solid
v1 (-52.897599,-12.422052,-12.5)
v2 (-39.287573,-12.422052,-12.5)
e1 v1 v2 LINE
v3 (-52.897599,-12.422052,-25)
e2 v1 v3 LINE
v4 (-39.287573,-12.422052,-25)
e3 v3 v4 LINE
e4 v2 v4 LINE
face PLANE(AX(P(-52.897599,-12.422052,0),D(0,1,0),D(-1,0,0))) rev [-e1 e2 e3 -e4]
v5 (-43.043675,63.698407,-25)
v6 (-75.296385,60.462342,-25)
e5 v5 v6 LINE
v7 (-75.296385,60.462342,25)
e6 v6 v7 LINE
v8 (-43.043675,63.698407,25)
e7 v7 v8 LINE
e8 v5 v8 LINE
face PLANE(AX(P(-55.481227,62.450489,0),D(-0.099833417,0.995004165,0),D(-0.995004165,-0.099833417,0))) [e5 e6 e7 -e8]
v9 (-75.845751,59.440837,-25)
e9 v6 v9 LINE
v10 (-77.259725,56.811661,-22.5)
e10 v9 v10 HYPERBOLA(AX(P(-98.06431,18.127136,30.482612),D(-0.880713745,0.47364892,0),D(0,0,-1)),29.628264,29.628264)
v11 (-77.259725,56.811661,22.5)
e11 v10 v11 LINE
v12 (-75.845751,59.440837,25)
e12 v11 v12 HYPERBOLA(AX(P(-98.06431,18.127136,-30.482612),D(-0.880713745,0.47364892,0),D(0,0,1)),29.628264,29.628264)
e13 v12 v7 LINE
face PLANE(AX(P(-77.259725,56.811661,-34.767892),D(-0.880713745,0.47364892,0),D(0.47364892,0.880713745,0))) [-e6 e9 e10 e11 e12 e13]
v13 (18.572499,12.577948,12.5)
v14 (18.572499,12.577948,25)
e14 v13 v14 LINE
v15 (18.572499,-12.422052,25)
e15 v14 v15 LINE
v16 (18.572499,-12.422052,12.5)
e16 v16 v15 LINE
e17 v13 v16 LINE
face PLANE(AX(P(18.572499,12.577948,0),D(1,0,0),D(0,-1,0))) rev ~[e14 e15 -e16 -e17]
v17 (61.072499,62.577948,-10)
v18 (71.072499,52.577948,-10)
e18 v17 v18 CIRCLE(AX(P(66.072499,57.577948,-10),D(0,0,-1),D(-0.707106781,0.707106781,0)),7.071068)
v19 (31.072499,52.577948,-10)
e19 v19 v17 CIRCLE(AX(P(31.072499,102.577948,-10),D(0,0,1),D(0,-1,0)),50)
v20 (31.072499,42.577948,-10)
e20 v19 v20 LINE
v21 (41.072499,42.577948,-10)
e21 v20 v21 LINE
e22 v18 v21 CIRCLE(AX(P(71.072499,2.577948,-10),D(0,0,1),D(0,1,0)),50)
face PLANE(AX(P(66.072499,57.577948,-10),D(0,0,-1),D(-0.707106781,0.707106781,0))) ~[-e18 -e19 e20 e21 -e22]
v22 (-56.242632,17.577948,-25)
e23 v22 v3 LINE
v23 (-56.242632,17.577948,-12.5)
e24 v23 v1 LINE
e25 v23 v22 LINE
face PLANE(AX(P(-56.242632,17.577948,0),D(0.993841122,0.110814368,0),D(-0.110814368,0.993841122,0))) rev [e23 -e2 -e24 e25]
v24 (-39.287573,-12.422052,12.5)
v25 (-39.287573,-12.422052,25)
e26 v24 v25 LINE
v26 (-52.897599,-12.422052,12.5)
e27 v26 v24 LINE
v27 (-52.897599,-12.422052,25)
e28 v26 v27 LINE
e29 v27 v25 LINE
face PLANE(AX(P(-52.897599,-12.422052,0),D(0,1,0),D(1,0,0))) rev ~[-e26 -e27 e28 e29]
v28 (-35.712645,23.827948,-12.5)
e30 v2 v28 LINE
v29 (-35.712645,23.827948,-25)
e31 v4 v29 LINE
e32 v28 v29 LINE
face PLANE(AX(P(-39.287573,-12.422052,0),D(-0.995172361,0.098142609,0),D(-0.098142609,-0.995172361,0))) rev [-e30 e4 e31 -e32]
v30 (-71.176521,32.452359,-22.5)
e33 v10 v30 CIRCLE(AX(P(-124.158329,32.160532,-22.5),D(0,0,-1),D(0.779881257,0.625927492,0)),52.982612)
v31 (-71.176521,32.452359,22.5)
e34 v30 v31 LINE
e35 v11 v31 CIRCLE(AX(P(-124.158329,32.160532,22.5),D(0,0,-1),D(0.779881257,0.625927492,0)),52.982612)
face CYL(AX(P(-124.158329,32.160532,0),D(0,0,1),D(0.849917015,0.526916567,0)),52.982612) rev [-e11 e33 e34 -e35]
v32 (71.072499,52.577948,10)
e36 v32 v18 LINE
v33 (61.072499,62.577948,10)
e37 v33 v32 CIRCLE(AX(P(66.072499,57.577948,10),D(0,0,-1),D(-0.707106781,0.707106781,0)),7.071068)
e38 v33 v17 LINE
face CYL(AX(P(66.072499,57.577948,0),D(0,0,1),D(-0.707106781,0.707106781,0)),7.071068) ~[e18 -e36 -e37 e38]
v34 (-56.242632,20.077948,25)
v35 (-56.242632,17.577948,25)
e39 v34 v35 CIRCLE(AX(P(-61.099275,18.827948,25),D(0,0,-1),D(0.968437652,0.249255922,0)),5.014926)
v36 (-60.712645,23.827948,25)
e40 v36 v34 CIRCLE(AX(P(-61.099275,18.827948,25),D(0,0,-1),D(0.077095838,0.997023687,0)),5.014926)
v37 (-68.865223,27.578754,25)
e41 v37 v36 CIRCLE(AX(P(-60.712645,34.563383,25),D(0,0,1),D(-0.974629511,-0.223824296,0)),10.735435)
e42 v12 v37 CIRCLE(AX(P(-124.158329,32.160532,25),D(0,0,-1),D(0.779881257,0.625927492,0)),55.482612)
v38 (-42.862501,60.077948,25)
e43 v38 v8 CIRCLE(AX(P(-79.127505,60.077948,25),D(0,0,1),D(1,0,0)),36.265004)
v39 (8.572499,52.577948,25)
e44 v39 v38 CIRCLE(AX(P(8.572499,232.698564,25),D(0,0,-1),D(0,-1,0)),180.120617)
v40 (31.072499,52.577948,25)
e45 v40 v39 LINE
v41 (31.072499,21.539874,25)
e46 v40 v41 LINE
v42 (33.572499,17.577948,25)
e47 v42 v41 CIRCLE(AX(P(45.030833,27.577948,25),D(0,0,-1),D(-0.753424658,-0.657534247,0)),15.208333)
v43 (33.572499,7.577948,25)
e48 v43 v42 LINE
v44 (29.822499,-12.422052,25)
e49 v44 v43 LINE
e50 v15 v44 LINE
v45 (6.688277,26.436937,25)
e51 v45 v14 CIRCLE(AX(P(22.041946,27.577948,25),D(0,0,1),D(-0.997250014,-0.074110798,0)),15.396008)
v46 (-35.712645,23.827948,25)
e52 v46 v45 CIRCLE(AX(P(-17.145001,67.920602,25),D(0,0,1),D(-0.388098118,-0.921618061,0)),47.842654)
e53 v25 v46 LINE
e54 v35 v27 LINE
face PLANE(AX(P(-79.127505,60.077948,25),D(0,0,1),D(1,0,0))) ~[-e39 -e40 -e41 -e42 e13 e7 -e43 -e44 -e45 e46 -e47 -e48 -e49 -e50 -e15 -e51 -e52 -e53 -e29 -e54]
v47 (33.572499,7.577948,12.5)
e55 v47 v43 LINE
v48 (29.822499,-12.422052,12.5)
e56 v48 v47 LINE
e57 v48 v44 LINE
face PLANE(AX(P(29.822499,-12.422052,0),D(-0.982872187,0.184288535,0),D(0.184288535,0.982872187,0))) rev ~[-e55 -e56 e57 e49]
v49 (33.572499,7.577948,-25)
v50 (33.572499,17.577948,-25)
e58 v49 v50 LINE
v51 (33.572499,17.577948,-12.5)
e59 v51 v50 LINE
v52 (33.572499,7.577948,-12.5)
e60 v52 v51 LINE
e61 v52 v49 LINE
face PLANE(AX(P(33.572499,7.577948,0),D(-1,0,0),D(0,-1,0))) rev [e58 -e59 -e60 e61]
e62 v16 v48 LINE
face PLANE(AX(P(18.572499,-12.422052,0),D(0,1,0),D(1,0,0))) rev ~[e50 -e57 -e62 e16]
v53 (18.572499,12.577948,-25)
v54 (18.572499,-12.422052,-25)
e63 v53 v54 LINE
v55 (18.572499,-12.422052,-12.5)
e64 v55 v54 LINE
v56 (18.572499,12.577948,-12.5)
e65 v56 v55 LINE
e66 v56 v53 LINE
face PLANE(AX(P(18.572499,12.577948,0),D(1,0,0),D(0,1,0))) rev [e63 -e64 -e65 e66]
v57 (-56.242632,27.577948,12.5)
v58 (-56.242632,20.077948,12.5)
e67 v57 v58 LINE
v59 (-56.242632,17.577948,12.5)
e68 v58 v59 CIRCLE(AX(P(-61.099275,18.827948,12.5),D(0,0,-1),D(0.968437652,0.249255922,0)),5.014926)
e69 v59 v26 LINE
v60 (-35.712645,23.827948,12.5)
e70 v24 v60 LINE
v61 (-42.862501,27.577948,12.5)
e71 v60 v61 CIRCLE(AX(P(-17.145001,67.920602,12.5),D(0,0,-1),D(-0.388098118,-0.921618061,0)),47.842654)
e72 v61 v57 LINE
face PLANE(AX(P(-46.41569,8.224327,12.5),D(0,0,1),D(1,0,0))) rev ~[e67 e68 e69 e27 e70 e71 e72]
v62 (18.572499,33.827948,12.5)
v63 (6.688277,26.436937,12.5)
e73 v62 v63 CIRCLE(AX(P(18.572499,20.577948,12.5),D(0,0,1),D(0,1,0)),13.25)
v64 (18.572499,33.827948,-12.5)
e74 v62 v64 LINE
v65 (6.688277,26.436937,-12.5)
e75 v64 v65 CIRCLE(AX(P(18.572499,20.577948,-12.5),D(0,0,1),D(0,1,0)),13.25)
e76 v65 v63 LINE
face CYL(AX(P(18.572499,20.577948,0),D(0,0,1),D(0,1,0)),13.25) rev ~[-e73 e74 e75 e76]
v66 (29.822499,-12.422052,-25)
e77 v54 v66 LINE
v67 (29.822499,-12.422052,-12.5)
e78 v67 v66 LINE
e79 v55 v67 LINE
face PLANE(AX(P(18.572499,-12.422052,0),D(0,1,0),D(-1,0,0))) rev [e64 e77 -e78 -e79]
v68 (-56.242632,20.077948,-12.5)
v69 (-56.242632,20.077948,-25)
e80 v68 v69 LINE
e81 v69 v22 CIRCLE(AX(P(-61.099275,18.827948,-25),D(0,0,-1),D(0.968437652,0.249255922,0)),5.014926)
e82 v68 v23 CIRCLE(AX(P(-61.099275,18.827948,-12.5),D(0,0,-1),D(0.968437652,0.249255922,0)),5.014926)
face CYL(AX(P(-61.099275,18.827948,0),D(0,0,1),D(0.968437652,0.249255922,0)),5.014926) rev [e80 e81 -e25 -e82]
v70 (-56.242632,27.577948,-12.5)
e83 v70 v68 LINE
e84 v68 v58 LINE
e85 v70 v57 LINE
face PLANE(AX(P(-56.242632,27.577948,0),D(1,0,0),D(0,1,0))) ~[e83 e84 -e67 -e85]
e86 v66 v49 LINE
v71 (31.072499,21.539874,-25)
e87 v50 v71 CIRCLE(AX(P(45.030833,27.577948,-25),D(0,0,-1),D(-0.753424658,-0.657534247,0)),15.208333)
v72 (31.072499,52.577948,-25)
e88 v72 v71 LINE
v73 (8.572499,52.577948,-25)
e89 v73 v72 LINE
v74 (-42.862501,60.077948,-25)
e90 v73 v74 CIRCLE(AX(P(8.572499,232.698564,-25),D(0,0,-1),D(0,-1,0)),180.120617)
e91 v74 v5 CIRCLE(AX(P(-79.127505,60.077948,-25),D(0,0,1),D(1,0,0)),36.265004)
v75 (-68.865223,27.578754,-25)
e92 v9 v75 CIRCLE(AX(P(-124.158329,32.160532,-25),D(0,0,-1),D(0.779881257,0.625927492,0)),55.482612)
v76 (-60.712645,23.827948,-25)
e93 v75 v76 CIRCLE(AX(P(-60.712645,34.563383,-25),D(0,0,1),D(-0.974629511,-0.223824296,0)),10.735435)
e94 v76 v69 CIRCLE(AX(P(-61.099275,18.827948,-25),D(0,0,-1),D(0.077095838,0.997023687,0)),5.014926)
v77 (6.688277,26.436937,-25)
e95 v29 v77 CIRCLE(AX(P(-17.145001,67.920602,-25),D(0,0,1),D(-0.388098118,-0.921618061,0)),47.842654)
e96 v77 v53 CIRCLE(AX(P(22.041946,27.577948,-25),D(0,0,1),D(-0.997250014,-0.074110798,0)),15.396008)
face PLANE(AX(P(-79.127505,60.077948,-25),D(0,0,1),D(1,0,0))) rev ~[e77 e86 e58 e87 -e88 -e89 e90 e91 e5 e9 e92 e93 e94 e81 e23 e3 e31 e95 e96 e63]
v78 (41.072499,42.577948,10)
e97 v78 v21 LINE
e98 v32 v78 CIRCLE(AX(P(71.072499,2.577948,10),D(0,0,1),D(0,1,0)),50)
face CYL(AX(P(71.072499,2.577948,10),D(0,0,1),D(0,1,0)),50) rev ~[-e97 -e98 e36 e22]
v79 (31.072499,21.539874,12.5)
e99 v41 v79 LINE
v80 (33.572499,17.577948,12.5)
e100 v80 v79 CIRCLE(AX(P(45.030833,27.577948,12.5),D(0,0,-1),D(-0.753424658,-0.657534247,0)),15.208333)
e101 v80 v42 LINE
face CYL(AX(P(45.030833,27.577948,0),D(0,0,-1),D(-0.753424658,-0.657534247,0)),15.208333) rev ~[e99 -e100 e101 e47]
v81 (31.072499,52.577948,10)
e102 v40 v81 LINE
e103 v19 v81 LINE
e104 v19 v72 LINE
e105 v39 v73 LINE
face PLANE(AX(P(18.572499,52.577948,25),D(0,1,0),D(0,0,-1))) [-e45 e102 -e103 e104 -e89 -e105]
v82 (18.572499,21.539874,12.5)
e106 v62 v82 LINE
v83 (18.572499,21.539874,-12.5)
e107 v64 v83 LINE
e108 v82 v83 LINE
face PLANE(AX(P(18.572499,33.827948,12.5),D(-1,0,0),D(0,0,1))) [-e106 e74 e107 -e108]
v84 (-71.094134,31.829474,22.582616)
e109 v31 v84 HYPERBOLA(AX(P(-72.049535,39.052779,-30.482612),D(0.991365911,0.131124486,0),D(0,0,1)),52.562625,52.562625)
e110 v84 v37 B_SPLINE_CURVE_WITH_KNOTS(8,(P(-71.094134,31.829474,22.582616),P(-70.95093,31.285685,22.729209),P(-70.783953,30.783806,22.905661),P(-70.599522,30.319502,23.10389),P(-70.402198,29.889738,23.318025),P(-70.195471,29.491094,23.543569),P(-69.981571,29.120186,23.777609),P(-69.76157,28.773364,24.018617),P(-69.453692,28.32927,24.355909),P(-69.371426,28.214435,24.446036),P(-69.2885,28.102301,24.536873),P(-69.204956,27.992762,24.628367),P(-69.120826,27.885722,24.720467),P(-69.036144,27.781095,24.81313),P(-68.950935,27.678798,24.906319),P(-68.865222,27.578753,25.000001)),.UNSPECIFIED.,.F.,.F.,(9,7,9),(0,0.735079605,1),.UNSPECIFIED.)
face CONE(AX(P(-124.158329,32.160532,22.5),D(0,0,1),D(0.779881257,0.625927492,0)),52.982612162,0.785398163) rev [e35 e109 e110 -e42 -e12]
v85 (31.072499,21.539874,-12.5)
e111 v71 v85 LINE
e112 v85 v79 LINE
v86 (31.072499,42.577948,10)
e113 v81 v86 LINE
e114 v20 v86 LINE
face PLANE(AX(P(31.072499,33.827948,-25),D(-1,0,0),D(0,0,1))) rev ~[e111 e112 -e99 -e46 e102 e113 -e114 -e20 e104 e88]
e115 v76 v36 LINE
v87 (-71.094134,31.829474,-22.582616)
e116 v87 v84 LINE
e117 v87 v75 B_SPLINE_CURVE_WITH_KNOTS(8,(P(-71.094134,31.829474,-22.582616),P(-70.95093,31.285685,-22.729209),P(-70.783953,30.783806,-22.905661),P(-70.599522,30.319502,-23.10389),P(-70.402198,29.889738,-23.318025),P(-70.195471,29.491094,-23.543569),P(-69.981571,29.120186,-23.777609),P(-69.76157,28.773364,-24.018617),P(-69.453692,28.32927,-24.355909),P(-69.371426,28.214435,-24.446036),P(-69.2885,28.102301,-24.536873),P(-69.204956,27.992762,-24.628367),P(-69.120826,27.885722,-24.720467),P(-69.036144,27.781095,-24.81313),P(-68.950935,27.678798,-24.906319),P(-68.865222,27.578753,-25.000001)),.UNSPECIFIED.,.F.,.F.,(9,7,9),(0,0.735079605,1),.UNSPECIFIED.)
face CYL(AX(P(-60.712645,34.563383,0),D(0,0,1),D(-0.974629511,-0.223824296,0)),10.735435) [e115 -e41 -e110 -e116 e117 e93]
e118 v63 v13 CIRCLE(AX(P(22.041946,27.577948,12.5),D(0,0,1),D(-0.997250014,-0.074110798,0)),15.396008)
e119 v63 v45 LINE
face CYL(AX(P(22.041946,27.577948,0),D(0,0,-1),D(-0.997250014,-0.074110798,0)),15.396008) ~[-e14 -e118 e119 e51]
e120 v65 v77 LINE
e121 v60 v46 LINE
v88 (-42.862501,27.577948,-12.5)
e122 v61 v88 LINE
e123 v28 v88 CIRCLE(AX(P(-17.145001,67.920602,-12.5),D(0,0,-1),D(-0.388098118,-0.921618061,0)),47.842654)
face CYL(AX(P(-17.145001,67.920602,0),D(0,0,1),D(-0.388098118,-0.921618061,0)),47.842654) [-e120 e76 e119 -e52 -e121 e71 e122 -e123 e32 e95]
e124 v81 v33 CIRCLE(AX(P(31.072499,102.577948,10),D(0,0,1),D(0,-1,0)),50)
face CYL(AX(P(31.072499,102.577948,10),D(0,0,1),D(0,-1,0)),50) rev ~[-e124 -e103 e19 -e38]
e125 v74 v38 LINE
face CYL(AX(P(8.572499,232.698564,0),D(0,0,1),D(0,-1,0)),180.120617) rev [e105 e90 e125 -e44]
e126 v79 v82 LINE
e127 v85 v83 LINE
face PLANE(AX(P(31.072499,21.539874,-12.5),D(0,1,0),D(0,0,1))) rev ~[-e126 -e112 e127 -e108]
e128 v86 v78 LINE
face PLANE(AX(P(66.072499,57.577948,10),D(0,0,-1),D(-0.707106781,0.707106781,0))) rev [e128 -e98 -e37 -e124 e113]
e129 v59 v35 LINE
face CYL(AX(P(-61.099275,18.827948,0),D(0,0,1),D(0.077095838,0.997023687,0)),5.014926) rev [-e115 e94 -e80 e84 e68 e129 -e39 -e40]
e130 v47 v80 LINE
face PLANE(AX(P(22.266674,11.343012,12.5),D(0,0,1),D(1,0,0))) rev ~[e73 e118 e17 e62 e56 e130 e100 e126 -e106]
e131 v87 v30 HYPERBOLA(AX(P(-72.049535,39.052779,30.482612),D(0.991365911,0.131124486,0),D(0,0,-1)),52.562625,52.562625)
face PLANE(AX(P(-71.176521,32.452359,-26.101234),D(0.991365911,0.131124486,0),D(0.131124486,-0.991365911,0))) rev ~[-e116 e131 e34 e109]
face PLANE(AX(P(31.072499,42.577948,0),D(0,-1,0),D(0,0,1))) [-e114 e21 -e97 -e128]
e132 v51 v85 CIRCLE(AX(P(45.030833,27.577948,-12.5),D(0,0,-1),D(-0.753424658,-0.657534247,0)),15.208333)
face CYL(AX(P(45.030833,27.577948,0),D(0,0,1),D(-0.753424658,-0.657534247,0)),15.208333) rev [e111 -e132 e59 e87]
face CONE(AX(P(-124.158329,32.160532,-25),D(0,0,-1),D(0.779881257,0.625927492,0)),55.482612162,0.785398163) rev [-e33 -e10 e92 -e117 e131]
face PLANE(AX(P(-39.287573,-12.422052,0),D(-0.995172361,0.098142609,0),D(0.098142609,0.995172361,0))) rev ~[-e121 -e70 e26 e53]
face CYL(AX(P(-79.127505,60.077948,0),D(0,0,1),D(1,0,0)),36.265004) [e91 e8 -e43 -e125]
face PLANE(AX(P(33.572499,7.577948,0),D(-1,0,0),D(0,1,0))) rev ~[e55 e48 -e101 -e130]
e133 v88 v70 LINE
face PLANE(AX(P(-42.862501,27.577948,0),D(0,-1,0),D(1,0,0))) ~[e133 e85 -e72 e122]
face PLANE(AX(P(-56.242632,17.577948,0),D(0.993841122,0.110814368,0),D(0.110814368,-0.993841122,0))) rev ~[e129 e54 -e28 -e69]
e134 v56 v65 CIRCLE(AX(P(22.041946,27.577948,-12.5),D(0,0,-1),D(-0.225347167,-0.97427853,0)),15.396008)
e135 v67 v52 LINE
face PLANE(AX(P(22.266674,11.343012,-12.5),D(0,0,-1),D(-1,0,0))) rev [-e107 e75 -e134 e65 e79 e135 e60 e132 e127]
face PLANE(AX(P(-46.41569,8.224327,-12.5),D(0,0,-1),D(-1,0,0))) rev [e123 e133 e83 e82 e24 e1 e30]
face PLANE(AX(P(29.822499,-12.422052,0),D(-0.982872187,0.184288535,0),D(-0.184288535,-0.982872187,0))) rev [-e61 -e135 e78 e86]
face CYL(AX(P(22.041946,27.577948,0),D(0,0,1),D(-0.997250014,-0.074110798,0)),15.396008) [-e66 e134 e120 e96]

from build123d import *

# Parameters (mm, degrees)
F1_DEPTH     = 25
F2_DEPTH     = 12.5
F4_DEPTH     = 12.5
F5_DEPTH     = 16.25
F7_DEPTH     = 24.3842223705
F6_W         = 10
F6_H         = 10
F8_DEPTH     = 40
F10_DEPTH    = 20
F11_W        = 7.0710678119
F11_H        = 20
F12_ANGLE    = 180
F13_W        = 25
F13_H        = 50
F13_W_2      = 11.2650044263
F14_ANGLE    = 5.7295779513
F15_T1_DEPTH = 52.2024679969
F15_T3_DEPTH = 69.535784442
F15_T6_ANGLE = 45.7032352823
F15_T8_ANGLE = 45.7032352823


# Not quite as in the source:
# - a fillet or chamfer that OpenCascade refuses, or shapes differently, is made with other operations: its cross-section is extruded or revolved along the edge and cut away or added
# - a pattern or mirror of a feature is missing from the dataset's text; its kind, count and spacing are read off the source's solid


with BuildPart() as f1:
    # F0 (on Top) → F1 (new body)
    with BuildSketch(Plane.XY):
        with BuildLine():
            ThreePointArc((8.5724992678, 52.5779476486), (-17.4169661561, 54.4628096646), (-42.8625009954, 60.0779476486))
            Line((-42.8625009954, 60.0779476486), (-79.1275054216, 60.0779476486))
            ThreePointArc((-79.1275054216, 60.0779476486), (-73.2024272044, 46.6744306132), (-71.1757168174, 32.1605315572))
            ThreePointArc((-71.1757168174, 32.1605315572), (-67.4004664777, 26.1656086442), (-60.7126449392, 23.8279476486))
            ThreePointArc((-60.7126449392, 23.8279476486), (-57.8761392565, 22.6699366601), (-56.2426317111, 20.0779476486))
            Line((-56.2426317111, 20.0779476486), (-56.2426317111, 27.5779476486))
            Line((-56.2426317111, 27.5779476486), (-42.8625009954, 27.5779476486))
            ThreePointArc((-42.8625009954, 27.5779476486), (-39.3668172692, 25.5518582213), (-35.7126449392, 23.8279476486))
            ThreePointArc((-35.7126449392, 23.8279476486), (-14.2067307678, 20.1682602333), (6.6882768972, 26.4369372072))
            ThreePointArc((6.6882768972, 26.4369372072), (11.5749679763, 31.8294833583), (18.5724992678, 33.8279476486))
            Line((18.5724992678, 33.8279476486), (18.5724992678, 40.0779476486))
            Line((18.5724992678, 40.0779476486), (18.5724992678, 52.5779476486))
            Line((18.5724992678, 52.5779476486), (8.5724992678, 52.5779476486))
        make_face()
        with BuildLine():
            Line((-56.2426317111, 27.5779476486), (-56.2426317111, 20.0779476486))
            ThreePointArc((-56.2426317111, 20.0779476486), (-56.084348871, 18.8279476486), (-56.2426317111, 17.5779476486))
            Line((-56.2426317111, 17.5779476486), (-52.8975990321, -12.4220523514))
            Line((-52.8975990321, -12.4220523514), (-39.2875729673, -12.4220523514))
            Line((-39.2875729673, -12.4220523514), (-35.7126449392, 23.8279476486))
            ThreePointArc((-35.7126449392, 23.8279476486), (-39.3668172692, 25.5518582213), (-42.8625009954, 27.5779476486))
            Line((-42.8625009954, 27.5779476486), (-56.2426317111, 27.5779476486))
        make_face()
        with BuildLine():
            ThreePointArc((29.8224992678, 27.5779476486), (25.0072681059, 32.1605315572), (18.5724992678, 33.8279476486))
            ThreePointArc((18.5724992678, 33.8279476486), (11.5749679763, 31.8294833583), (6.6882768972, 26.4369372072))
            ThreePointArc((6.6882768972, 26.4369372072), (10.35454594, 17.5558849939), (18.5724992678, 12.5779476486))
            Line((18.5724992678, 12.5779476486), (18.5724992678, -12.4220523514))
            Line((18.5724992678, -12.4220523514), (29.8224992678, -12.4220523514))
            Line((29.8224992678, -12.4220523514), (33.5724992678, 7.5779476486))
            Line((33.5724992678, 7.5779476486), (33.5724992678, 17.5779476486))
            ThreePointArc((33.5724992678, 17.5779476486), (30.7908263589, 22.2379453078), (29.8224992678, 27.5779476486))
        make_face()
    extrude(amount=F1_DEPTH)

    # F0 (on Top) → F2 (cut)
    with BuildSketch(Plane.XY):
        with BuildLine():
            ThreePointArc((29.8224992678, 27.5779476486), (25.0072681059, 32.1605315572), (18.5724992678, 33.8279476486))
            ThreePointArc((18.5724992678, 33.8279476486), (11.5749679763, 31.8294833583), (6.6882768972, 26.4369372072))
            ThreePointArc((6.6882768972, 26.4369372072), (10.35454594, 17.5558849939), (18.5724992678, 12.5779476486))
            Line((18.5724992678, 12.5779476486), (18.5724992678, -12.4220523514))
            Line((18.5724992678, -12.4220523514), (29.8224992678, -12.4220523514))
            Line((29.8224992678, -12.4220523514), (33.5724992678, 7.5779476486))
            Line((33.5724992678, 7.5779476486), (33.5724992678, 17.5779476486))
            ThreePointArc((33.5724992678, 17.5779476486), (30.7908263589, 22.2379453078), (29.8224992678, 27.5779476486))
        make_face()
        with BuildLine():
            Line((-56.2426317111, 27.5779476486), (-56.2426317111, 20.0779476486))
            ThreePointArc((-56.2426317111, 20.0779476486), (-56.084348871, 18.8279476486), (-56.2426317111, 17.5779476486))
            Line((-56.2426317111, 17.5779476486), (-52.8975990321, -12.4220523514))
            Line((-52.8975990321, -12.4220523514), (-39.2875729673, -12.4220523514))
            Line((-39.2875729673, -12.4220523514), (-35.7126449392, 23.8279476486))
            ThreePointArc((-35.7126449392, 23.8279476486), (-39.3668172692, 25.5518582213), (-42.8625009954, 27.5779476486))
            Line((-42.8625009954, 27.5779476486), (-56.2426317111, 27.5779476486))
        make_face()
    extrude(amount=F2_DEPTH, mode=Mode.SUBTRACT)

    # F3: F1 across plane


with BuildPart() as f1_1:
    add(f1.part)
    add(f1.part.mirror(Plane.XY))

    # F4 (add): a face of the model
    f4_faces = [f1_1.faces().sort_by_distance(p)[0] for p in [
        (18.5724992678, 43.2029476486, 0),
    ]]
    extrude(f4_faces, amount=F4_DEPTH)

    # F5 (add, through all): a face of the model
    f5_faces = [f1_1.faces().sort_by_distance(p)[0] for p in [
        (24.8224992678, 33.8279476486, 0),
    ]]
    extrude(f5_faces, amount=F5_DEPTH)

    # F6 (on face) → F7 (cut, through all)
    with BuildSketch(Plane.YZ.offset(31.0724992678)):
        Polygon((21.5398740044, 0), (21.5398740044, 12.5), (17.5779476486, 12.5), (17.5779476486, -12.5), (21.5398740044, -12.5), align=None)
    extrude(amount=-F7_DEPTH, mode=Mode.SUBTRACT)

    # F6 (on face) → F8 (join)
    with BuildSketch(Plane.YZ.offset(31.0724992678)):
        Polygon((62.5779476486, 10), (52.5779476486, 10), (52.5779476486, 0), (52.5779476486, -10), (62.5779476486, -10), align=None)
        with Locations((47.5779476486, 5)):
            Rectangle(F6_W, F6_H)
    f8 = extrude(amount=F8_DEPTH)

    # F8_copies: F8 across plane
    add(f8.mirror(Plane(origin=(0, 0, 0), x_dir=(-1, 0, 0), z_dir=(0, 0, -1))))

    # F9 (on face) → F10 (cut, through all)
    with BuildSketch(Plane.XY.offset(10)):
        with BuildLine():
            ThreePointArc((31.0724992678, 52.5779476486), (46.8838875686, 55.1437827461), (61.0724992678, 62.5779476486))
            Line((61.0724992678, 62.5779476486), (51.0724992678, 62.5779476486))
            Line((51.0724992678, 62.5779476486), (31.0724992678, 62.5779476486))
            Line((31.0724992678, 62.5779476486), (31.0724992678, 52.5779476486))
        make_face()
        Polygon((71.0724992678, 52.5779476486), (71.0724992678, 62.5779476486), (61.0724992678, 62.5779476486), align=None)
        with BuildLine():
            Line((71.0724992678, 42.5779476486), (71.0724992678, 52.5779476486))
            ThreePointArc((71.0724992678, 52.5779476486), (55.2611109669, 50.0121125511), (41.0724992678, 42.5779476486))
            Line((41.0724992678, 42.5779476486), (51.0724992678, 42.5779476486))
            Line((51.0724992678, 42.5779476486), (71.0724992678, 42.5779476486))
        make_face()
    extrude(amount=-F10_DEPTH, mode=Mode.SUBTRACT)

    # F11 (on face) → F12 (revolve)
    with BuildSketch(Plane(origin=(61.8252234582, 61.8252234582, 0), x_dir=(-0.7071067812, 0.7071067812, 0), z_dir=(0.7071067812, 0.7071067812, 0))):
        with Locations((-2.4710211471, 0)):
            Rectangle(F11_W, F11_H)
    revolve(axis=Axis((66.0724992678, 57.5779476486, 0), (0, 0, -1)), revolution_arc=F12_ANGLE)

    # F13 (on face) → F14 (revolve)
    with BuildSketch(Plane(origin=(0, 60.0779476486, 0), x_dir=(-1, 0, 0), z_dir=(0, 1, 0))):
        with Locations((55.3625009954, 0)):
            Rectangle(F13_W, F13_H)
        with Locations((73.4950032085, 0)):
            Rectangle(F13_W_2, F13_H)
    revolve(axis=Axis((-79.1275054216, 60.0779476486, 0), (0, 0, 1)), revolution_arc=F14_ANGLE)

    # F15: chamfer of 2.5 on 4 edges, made by hand

    # F15_s2 → F15_t1 (cut)
    with BuildSketch(Plane.XY.offset(-26.1012339984)):
        with BuildLine():
            Line((-71.1765205144, 32.4523590493), (-71.0941336441, 31.829473599))
            ThreePointArc((-71.0941336441, 31.829473599), (-71.1242415299, 31.9464717064), (-71.1757168174, 32.1605315572))
            ThreePointArc((-71.1757168174, 32.1605315572), (-71.1760775289, 32.3560379433), (-71.1765205144, 32.4523590493))
        make_face()
    extrude(amount=F15_T1_DEPTH, mode=Mode.SUBTRACT)

    # F15_s4 → F15_t3 (cut)
    with BuildSketch(Plane.XY.offset(-34.767892221)):
        with BuildLine():
            Line((-77.2597253727, 56.8116607658), (-75.2963846316, 60.4623418968))
            Line((-75.2963846316, 60.4623418968), (-79.1275054216, 60.0779476486))
            ThreePointArc((-79.1275054216, 60.0779476486), (-78.1514580859, 58.4383743549), (-77.2597253727, 56.8116607658))
        make_face()
    extrude(amount=F15_T3_DEPTH, mode=Mode.SUBTRACT)

    # F15_s5 → F15_t6 (revolve, cut)
    with BuildSketch(Plane(origin=(-64.3425340859, 80.1682893814, 0), x_dir=(0, 0, 1), z_dir=(-0.6259274923, 0.7798812566, 0))):
        Polygon((22.5, -23.7159805894), (25, -21.2159805894), (25, -23.7159805894), align=None)
    revolve(axis=Axis((-124.1583289793, 32.1605315572, 25), (0, 0, -1)), revolution_arc=F15_T6_ANGLE, mode=Mode.SUBTRACT)

    # F15_s7 → F15_t8 (revolve, cut)
    with BuildSketch(Plane(origin=(-64.3425340859, 80.1682893814, 0), x_dir=(0, 0, 1), z_dir=(-0.6259274923, 0.7798812566, 0))):
        Polygon((-25, -21.2159805894), (-22.5, -23.7159805894), (-25, -23.7159805894), align=None)
    revolve(axis=Axis((-124.1583289793, 32.1605315572, -25), (0, 0, -1)), revolution_arc=F15_T8_ANGLE, mode=Mode.SUBTRACT)


solid = f1_1.part
